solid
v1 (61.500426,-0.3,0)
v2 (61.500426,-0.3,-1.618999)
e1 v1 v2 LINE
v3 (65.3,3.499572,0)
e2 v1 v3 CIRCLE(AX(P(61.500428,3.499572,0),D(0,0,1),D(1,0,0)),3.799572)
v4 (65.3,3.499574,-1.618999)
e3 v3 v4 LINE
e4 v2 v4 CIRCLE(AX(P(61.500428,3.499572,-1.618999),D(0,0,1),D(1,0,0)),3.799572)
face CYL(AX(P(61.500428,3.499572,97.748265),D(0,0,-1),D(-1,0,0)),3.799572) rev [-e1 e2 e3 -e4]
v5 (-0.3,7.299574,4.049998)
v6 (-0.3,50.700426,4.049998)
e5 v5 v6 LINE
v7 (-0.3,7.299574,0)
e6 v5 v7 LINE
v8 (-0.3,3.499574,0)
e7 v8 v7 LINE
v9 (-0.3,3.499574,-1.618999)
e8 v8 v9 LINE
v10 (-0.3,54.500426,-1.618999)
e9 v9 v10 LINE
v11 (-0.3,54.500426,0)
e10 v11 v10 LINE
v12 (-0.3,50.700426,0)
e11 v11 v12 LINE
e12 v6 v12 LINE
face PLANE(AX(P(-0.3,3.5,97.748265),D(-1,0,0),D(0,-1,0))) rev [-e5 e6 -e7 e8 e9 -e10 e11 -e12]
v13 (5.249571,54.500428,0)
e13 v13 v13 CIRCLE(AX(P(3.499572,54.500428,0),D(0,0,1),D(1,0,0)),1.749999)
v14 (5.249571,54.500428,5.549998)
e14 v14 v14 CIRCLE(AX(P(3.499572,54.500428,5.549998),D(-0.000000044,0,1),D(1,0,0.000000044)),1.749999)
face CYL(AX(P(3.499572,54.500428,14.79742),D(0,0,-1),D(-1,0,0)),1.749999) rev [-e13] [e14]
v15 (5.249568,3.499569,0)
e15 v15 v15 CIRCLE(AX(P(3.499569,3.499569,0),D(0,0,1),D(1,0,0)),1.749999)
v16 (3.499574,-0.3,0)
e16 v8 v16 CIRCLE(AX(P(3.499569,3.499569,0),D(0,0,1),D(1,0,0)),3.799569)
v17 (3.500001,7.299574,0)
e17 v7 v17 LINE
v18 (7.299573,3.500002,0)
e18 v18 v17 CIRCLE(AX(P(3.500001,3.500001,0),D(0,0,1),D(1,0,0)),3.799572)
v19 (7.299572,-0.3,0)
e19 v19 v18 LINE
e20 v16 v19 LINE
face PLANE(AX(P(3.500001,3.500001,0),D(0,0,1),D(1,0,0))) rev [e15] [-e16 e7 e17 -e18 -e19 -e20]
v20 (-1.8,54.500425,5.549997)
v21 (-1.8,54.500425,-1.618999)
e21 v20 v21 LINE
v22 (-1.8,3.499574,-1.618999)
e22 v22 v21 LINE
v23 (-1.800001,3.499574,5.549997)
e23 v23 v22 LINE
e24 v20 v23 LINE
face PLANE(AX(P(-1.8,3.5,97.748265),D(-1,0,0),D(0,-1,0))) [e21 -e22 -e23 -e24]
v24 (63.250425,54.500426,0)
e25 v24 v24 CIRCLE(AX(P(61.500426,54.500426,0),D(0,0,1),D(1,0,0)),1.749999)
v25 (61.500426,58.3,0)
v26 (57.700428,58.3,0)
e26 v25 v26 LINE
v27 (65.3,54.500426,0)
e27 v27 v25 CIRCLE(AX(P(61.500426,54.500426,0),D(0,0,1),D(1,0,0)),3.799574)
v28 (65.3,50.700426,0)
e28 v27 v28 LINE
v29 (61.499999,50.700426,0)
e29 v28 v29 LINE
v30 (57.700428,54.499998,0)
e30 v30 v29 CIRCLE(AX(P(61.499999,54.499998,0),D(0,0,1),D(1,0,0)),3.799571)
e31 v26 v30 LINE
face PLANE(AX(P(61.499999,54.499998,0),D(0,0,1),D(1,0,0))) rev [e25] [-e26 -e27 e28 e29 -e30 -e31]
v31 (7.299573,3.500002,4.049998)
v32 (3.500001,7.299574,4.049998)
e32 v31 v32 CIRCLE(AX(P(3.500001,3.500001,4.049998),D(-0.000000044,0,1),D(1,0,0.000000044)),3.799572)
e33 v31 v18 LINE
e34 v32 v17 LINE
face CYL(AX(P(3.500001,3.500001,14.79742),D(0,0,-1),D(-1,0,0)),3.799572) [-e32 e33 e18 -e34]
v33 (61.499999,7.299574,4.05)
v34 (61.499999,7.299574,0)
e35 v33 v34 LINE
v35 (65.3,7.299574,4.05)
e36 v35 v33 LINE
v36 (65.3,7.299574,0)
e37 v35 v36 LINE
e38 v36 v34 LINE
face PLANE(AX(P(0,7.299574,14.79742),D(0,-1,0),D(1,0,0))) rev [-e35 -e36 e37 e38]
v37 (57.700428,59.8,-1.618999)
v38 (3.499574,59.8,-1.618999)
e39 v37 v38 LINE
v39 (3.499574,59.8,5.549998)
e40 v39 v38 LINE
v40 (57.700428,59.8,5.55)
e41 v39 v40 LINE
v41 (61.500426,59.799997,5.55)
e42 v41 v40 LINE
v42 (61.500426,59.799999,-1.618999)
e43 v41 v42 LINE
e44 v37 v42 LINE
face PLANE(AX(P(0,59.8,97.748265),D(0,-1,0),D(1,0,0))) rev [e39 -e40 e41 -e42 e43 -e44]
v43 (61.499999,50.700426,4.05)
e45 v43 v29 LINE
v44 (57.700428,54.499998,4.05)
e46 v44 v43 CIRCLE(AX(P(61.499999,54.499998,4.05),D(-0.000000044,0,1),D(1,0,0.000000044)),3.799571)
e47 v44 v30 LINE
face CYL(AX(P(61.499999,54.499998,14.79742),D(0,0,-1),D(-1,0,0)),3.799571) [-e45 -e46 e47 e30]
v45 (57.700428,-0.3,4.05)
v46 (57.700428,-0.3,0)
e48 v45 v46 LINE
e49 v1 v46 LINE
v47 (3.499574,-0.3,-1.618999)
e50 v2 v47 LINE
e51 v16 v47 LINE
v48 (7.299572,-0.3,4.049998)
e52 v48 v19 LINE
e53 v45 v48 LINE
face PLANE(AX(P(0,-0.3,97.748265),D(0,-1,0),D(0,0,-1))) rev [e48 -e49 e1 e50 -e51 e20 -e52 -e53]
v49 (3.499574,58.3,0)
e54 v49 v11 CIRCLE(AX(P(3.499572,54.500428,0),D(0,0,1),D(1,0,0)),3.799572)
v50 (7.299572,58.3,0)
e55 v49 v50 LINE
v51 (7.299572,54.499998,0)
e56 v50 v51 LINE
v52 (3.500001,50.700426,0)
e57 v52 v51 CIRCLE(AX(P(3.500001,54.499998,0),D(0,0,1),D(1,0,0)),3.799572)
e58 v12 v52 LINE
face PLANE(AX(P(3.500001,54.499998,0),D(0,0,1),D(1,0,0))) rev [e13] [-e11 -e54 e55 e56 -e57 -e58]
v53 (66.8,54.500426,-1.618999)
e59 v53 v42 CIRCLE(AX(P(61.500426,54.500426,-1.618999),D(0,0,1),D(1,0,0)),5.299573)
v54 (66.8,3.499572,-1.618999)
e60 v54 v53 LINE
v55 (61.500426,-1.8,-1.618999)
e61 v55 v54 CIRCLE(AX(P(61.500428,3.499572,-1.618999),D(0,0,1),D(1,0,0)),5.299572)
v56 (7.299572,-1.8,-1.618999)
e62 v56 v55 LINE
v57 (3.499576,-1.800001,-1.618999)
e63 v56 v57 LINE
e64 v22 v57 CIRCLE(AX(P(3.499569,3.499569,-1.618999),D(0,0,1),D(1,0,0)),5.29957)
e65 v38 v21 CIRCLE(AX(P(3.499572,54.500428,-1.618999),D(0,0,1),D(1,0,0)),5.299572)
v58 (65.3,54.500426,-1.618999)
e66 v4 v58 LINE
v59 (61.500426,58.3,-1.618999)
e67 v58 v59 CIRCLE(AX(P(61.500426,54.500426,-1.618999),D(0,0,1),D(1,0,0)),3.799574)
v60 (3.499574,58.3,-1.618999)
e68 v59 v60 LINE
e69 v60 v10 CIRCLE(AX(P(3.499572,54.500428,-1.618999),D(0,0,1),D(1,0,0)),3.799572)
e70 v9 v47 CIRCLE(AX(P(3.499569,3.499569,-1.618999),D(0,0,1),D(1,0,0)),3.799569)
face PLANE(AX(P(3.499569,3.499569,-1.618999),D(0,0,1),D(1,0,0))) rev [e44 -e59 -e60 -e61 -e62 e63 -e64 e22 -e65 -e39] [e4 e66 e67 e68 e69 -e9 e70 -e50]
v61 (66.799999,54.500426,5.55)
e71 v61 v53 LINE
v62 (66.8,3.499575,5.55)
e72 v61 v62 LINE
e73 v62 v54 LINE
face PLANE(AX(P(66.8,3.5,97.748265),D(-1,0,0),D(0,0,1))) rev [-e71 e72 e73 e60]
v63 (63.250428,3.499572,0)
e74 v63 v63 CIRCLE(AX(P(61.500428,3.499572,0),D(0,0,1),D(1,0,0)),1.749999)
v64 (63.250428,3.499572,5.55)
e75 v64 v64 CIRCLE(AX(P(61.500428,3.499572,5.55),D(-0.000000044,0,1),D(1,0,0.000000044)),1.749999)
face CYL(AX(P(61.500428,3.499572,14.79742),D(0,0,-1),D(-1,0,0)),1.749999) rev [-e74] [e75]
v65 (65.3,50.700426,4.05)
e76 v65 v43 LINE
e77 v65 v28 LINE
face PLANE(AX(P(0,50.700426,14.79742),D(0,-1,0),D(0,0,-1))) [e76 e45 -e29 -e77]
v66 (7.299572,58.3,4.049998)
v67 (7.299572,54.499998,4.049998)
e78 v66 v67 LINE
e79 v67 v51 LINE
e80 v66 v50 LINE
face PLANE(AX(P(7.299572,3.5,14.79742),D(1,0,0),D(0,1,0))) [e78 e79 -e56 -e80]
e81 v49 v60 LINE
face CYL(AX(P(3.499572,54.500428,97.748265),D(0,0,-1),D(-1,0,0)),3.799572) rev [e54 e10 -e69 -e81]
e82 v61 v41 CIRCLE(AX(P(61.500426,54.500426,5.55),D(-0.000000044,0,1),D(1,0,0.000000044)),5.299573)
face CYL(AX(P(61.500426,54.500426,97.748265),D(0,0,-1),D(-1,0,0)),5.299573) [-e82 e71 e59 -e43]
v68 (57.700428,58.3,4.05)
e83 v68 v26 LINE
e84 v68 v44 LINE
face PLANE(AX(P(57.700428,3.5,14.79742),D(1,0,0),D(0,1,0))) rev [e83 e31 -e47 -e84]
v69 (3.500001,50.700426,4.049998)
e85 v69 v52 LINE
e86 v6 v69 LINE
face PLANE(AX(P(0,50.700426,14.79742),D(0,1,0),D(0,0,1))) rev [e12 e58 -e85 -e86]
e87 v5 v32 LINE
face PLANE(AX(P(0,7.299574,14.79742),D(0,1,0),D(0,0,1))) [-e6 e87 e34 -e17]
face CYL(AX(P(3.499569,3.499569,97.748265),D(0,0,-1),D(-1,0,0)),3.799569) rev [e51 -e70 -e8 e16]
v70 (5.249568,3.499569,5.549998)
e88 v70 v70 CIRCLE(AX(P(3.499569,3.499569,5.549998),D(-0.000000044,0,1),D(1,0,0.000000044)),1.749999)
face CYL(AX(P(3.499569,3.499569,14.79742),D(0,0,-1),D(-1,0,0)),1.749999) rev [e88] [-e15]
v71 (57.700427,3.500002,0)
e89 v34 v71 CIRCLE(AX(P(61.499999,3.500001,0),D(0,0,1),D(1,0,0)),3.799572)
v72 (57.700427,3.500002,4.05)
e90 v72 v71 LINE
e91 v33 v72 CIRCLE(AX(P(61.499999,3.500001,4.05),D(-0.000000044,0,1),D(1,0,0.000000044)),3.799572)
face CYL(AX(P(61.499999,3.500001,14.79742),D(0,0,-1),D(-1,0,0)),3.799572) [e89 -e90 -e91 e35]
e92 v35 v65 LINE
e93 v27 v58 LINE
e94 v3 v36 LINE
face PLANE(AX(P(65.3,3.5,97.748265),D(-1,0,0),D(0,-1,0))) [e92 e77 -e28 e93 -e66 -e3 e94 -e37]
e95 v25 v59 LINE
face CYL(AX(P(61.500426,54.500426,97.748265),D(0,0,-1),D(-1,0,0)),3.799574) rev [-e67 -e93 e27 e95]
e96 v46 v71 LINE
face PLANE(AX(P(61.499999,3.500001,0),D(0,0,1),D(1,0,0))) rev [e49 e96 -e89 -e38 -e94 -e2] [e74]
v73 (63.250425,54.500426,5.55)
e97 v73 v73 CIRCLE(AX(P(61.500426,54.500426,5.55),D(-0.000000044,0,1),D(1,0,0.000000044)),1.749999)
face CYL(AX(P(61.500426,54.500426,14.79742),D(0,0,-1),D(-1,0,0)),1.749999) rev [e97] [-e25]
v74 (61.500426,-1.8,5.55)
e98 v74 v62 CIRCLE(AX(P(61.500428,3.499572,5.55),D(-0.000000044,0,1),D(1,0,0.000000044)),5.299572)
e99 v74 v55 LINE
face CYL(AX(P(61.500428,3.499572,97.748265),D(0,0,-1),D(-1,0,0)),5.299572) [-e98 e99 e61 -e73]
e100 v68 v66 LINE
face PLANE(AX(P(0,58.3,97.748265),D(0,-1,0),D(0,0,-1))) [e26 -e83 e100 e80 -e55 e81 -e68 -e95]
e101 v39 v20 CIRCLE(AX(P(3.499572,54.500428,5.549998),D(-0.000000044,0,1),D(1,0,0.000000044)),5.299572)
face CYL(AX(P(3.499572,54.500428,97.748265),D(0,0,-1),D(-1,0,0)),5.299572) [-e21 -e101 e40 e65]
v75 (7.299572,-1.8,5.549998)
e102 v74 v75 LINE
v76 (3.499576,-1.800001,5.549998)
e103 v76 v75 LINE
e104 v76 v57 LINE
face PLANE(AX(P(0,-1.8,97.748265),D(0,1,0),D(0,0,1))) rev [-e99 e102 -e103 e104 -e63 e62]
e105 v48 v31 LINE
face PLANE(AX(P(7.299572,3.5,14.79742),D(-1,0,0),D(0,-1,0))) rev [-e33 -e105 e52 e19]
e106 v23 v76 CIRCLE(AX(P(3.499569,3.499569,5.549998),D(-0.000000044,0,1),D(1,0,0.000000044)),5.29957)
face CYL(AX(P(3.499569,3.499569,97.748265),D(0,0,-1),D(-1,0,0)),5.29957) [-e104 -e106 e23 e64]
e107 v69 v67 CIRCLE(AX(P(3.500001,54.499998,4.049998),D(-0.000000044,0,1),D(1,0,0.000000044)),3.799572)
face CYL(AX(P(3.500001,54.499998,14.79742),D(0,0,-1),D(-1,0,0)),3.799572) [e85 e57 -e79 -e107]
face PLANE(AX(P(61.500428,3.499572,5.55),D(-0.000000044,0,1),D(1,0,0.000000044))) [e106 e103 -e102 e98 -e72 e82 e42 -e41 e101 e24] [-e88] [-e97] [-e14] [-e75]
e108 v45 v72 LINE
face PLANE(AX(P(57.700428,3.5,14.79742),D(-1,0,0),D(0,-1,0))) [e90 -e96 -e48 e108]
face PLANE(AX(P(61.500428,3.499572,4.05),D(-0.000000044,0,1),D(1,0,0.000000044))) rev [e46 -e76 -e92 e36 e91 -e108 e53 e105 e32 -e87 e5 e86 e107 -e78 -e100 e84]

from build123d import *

# Parameters (mm, degrees)
BOSS_EXTRUDE2_START     = -1.618999
SKETCH1_W               = 50.400855702
SKETCH1_H               = 1.5
SKETCH1_W_2             = 1.5
SKETCH1_H_2             = 43.400852302
BOSS_EXTRUDE2_DEPTH     = 5.668998934
SKETCH1_5_R             = 1.74999934
BOSS_EXTRUDE3_DEPTH     = 4.049997769
BOSS_EXTRUDE4_START     = 4.049997821
BOSS_EXTRUDE4_OUTLINE_R = 1.74999934
BOSS_EXTRUDE4_DEPTH     = 1.499999948


# Read off the part's stored shape, not the designer's step: Boss-Extrude4
with BuildPart() as part:
    # Sketch1 → Boss-Extrude2 (new body)
    with BuildSketch(Plane.XY.offset(BOSS_EXTRUDE2_START)):
        with BuildLine():
            Line((7.299572149, 59.8), (3.499574174, 59.8))
            ThreePointArc((3.499574174, 59.8), (-0.247791806, 58.247791067), (-1.8, 54.500424782))
            Line((-1.8, 54.500424782), (-1.8, 50.700426151))
            Line((-1.8, 50.700426151), (-0.3, 50.700426151))
            Line((-0.3, 50.700426151), (-0.3, 54.500425826))
            ThreePointArc((-0.3, 54.500425826), (0.812868735, 57.187131265), (3.499574174, 58.3))
            Line((3.499574174, 58.3), (7.299572149, 58.3))
            Line((7.299572149, 58.3), (7.299572149, 59.8))
        make_face()
        with Locations((32.5, 59.05)):
            Rectangle(SKETCH1_W, SKETCH1_H)
        with BuildLine():
            ThreePointArc((61.500425826, 59.799997355), (65.247788792, 58.247788792), (66.8, 54.500425826))
            Line((66.8, 54.500425826), (66.8, 50.700426151))
            Line((66.8, 50.700426151), (65.3, 50.700426151))
            Line((65.3, 50.700426151), (65.3, 54.500425826))
            ThreePointArc((65.3, 54.500425826), (64.18713049, 57.18713049), (61.500425826, 58.3))
            Line((61.500425826, 58.3), (57.700427851, 58.3))
            Line((57.700427851, 58.3), (57.700427851, 59.8))
            Line((57.700427851, 59.8), (61.500425826, 59.799997355))
        make_face()
        with Locations((66.05, 29)):
            Rectangle(SKETCH1_W_2, SKETCH1_H_2)
        with BuildLine():
            Line((57.700427851, -1.8), (61.500425826, -1.8))
            ThreePointArc((61.500425826, -1.8), (65.247791806, -0.247791067), (66.8, 3.499575218))
            Line((66.8, 3.499575218), (66.8, 7.299573849))
            Line((66.8, 7.299573849), (65.3, 7.299573849))
            Line((65.3, 7.299573849), (65.3, 3.499574174))
            ThreePointArc((65.3, 3.499574174), (64.187131265, 0.812868735), (61.500425826, -0.3))
            Line((61.500425826, -0.3), (57.700427851, -0.3))
            Line((57.700427851, -0.3), (57.700427851, -1.8))
        make_face()
        with Locations((32.5, -1.05)):
            Rectangle(SKETCH1_W, SKETCH1_H)
        with Locations((-1.05, 29)):
            Rectangle(SKETCH1_W_2, SKETCH1_H_2)
        with BuildLine():
            ThreePointArc((3.499576262, -1.800002645), (-0.247793343, -0.24779482), (-1.8, 3.499574174))
            Line((-1.8, 3.499574174), (-1.8, 7.299573849))
            Line((-1.8, 7.299573849), (-0.3, 7.299573849))
            Line((-0.3, 7.299573849), (-0.3, 3.499574174))
            ThreePointArc((-0.3, 3.499574174), (0.812867961, 0.812867961), (3.499574174, -0.3))
            Line((3.499574174, -0.3), (7.299572149, -0.3))
            Line((7.299572149, -0.3), (7.299572149, -1.8))
            Line((7.299572149, -1.8), (3.499576262, -1.800002645))
        make_face()
    extrude(amount=BOSS_EXTRUDE2_DEPTH)

    # Sketch1<5> → Boss-Extrude3 (add)
    # profile 1 of 4: a face of its own
    with BuildSketch(Plane.XY):
        with BuildLine():
            Line((7.299572149, 3.50000232), (7.299572149, -0.3))
            Line((7.299572149, -0.3), (3.499574174, -0.3))
            ThreePointArc((3.499574174, -0.3), (0.812867961, 0.812867961), (-0.3, 3.499574174))
            Line((-0.3, 3.499574174), (-0.3, 7.299573849))
            Line((-0.3, 7.299573849), (3.50000062, 7.299573849))
            ThreePointArc((3.50000062, 7.299573849), (6.186702813, 6.186704015), (7.299572149, 3.50000232))
        make_face()
        with Locations((3.499568884, 3.499568884)):
            Circle(SKETCH1_5_R, mode=Mode.SUBTRACT)
    # profile 2 of 4: a face of its own
    with BuildSketch(Plane.XY):
        with BuildLine():
            Line((7.299572149, 58.3), (3.499574174, 58.3))
            ThreePointArc((3.499574174, 58.3), (0.812868735, 57.187131265), (-0.3, 54.500425826))
            Line((-0.3, 54.500425826), (-0.3, 50.700426151))
            Line((-0.3, 50.700426151), (3.50000062, 50.700426151))
            ThreePointArc((3.50000062, 50.700426151), (6.186703414, 51.813294886), (7.299572149, 54.49999768))
            Line((7.299572149, 54.49999768), (7.299572149, 58.3))
        make_face()
        with Locations((3.499571529, 54.500428471)):
            Circle(SKETCH1_5_R, mode=Mode.SUBTRACT)
    # profile 3 of 4: a face of its own
    with BuildSketch(Plane.XY):
        with BuildLine():
            ThreePointArc((61.500425826, 58.3), (64.18713049, 57.18713049), (65.3, 54.500425826))
            Line((65.3, 54.500425826), (65.3, 50.700426151))
            Line((65.3, 50.700426151), (61.49999938, 50.700426151))
            ThreePointArc((61.49999938, 50.700426151), (58.813296614, 51.813295049), (57.700427851, 54.49999768))
            Line((57.700427851, 54.49999768), (57.700427851, 58.3))
            Line((57.700427851, 58.3), (61.500425826, 58.3))
        make_face()
        with Locations((61.500425826, 54.500425826)):
            Circle(SKETCH1_5_R, mode=Mode.SUBTRACT)
    # profile 4 of 4: a face of its own
    with BuildSketch(Plane.XY):
        with BuildLine():
            Line((57.700427851, -0.3), (61.500425826, -0.3))
            ThreePointArc((61.500425826, -0.3), (64.187131265, 0.812868735), (65.3, 3.499574174))
            Line((65.3, 3.499574174), (65.3, 7.299573849))
            Line((65.3, 7.299573849), (61.49999938, 7.299573849))
            ThreePointArc((61.49999938, 7.299573849), (58.813297215, 6.186703852), (57.700427851, 3.50000232))
            Line((57.700427851, 3.50000232), (57.700427851, -0.3))
        make_face()
        with Locations((61.500428471, 3.499571529)):
            Circle(SKETCH1_5_R, mode=Mode.SUBTRACT)
    extrude(amount=BOSS_EXTRUDE3_DEPTH)

    # Boss-Extrude4 outline → Boss-Extrude4 (add)
    with BuildSketch(Plane.XY.offset(BOSS_EXTRUDE4_START)):
        with BuildLine():
            ThreePointArc((-1.800001322, 3.499574174), (-0.247792408, -0.247793885), (3.499576262, -1.800001322))
            Line((3.499576262, -1.800001322), (61.500425826, -1.8))
            ThreePointArc((61.500425826, -1.8), (65.247791806, -0.247791067), (66.8, 3.499575218))
            Line((66.8, 3.499575218), (66.799998678, 54.500425826))
            ThreePointArc((66.799998678, 54.500425826), (65.247789727, 58.247789727), (61.500425826, 59.799998678))
            Line((61.500425826, 59.799998678), (3.499574174, 59.8))
            ThreePointArc((3.499574174, 59.8), (-0.247791806, 58.247791067), (-1.8, 54.500424782))
            Line((-1.8, 54.500424782), (-1.800001322, 3.499574174))
        make_face()
        with Locations((3.499568884, 3.499568884)):
            Circle(BOSS_EXTRUDE4_OUTLINE_R, mode=Mode.SUBTRACT)
        with Locations((61.500428471, 3.499571529)):
            Circle(BOSS_EXTRUDE4_OUTLINE_R, mode=Mode.SUBTRACT)
        with Locations((3.499571529, 54.500428471)):
            Circle(BOSS_EXTRUDE4_OUTLINE_R, mode=Mode.SUBTRACT)
        with Locations((61.500425826, 54.500425826)):
            Circle(BOSS_EXTRUDE4_OUTLINE_R, mode=Mode.SUBTRACT)
    extrude(amount=BOSS_EXTRUDE4_DEPTH)


solid = part.part
